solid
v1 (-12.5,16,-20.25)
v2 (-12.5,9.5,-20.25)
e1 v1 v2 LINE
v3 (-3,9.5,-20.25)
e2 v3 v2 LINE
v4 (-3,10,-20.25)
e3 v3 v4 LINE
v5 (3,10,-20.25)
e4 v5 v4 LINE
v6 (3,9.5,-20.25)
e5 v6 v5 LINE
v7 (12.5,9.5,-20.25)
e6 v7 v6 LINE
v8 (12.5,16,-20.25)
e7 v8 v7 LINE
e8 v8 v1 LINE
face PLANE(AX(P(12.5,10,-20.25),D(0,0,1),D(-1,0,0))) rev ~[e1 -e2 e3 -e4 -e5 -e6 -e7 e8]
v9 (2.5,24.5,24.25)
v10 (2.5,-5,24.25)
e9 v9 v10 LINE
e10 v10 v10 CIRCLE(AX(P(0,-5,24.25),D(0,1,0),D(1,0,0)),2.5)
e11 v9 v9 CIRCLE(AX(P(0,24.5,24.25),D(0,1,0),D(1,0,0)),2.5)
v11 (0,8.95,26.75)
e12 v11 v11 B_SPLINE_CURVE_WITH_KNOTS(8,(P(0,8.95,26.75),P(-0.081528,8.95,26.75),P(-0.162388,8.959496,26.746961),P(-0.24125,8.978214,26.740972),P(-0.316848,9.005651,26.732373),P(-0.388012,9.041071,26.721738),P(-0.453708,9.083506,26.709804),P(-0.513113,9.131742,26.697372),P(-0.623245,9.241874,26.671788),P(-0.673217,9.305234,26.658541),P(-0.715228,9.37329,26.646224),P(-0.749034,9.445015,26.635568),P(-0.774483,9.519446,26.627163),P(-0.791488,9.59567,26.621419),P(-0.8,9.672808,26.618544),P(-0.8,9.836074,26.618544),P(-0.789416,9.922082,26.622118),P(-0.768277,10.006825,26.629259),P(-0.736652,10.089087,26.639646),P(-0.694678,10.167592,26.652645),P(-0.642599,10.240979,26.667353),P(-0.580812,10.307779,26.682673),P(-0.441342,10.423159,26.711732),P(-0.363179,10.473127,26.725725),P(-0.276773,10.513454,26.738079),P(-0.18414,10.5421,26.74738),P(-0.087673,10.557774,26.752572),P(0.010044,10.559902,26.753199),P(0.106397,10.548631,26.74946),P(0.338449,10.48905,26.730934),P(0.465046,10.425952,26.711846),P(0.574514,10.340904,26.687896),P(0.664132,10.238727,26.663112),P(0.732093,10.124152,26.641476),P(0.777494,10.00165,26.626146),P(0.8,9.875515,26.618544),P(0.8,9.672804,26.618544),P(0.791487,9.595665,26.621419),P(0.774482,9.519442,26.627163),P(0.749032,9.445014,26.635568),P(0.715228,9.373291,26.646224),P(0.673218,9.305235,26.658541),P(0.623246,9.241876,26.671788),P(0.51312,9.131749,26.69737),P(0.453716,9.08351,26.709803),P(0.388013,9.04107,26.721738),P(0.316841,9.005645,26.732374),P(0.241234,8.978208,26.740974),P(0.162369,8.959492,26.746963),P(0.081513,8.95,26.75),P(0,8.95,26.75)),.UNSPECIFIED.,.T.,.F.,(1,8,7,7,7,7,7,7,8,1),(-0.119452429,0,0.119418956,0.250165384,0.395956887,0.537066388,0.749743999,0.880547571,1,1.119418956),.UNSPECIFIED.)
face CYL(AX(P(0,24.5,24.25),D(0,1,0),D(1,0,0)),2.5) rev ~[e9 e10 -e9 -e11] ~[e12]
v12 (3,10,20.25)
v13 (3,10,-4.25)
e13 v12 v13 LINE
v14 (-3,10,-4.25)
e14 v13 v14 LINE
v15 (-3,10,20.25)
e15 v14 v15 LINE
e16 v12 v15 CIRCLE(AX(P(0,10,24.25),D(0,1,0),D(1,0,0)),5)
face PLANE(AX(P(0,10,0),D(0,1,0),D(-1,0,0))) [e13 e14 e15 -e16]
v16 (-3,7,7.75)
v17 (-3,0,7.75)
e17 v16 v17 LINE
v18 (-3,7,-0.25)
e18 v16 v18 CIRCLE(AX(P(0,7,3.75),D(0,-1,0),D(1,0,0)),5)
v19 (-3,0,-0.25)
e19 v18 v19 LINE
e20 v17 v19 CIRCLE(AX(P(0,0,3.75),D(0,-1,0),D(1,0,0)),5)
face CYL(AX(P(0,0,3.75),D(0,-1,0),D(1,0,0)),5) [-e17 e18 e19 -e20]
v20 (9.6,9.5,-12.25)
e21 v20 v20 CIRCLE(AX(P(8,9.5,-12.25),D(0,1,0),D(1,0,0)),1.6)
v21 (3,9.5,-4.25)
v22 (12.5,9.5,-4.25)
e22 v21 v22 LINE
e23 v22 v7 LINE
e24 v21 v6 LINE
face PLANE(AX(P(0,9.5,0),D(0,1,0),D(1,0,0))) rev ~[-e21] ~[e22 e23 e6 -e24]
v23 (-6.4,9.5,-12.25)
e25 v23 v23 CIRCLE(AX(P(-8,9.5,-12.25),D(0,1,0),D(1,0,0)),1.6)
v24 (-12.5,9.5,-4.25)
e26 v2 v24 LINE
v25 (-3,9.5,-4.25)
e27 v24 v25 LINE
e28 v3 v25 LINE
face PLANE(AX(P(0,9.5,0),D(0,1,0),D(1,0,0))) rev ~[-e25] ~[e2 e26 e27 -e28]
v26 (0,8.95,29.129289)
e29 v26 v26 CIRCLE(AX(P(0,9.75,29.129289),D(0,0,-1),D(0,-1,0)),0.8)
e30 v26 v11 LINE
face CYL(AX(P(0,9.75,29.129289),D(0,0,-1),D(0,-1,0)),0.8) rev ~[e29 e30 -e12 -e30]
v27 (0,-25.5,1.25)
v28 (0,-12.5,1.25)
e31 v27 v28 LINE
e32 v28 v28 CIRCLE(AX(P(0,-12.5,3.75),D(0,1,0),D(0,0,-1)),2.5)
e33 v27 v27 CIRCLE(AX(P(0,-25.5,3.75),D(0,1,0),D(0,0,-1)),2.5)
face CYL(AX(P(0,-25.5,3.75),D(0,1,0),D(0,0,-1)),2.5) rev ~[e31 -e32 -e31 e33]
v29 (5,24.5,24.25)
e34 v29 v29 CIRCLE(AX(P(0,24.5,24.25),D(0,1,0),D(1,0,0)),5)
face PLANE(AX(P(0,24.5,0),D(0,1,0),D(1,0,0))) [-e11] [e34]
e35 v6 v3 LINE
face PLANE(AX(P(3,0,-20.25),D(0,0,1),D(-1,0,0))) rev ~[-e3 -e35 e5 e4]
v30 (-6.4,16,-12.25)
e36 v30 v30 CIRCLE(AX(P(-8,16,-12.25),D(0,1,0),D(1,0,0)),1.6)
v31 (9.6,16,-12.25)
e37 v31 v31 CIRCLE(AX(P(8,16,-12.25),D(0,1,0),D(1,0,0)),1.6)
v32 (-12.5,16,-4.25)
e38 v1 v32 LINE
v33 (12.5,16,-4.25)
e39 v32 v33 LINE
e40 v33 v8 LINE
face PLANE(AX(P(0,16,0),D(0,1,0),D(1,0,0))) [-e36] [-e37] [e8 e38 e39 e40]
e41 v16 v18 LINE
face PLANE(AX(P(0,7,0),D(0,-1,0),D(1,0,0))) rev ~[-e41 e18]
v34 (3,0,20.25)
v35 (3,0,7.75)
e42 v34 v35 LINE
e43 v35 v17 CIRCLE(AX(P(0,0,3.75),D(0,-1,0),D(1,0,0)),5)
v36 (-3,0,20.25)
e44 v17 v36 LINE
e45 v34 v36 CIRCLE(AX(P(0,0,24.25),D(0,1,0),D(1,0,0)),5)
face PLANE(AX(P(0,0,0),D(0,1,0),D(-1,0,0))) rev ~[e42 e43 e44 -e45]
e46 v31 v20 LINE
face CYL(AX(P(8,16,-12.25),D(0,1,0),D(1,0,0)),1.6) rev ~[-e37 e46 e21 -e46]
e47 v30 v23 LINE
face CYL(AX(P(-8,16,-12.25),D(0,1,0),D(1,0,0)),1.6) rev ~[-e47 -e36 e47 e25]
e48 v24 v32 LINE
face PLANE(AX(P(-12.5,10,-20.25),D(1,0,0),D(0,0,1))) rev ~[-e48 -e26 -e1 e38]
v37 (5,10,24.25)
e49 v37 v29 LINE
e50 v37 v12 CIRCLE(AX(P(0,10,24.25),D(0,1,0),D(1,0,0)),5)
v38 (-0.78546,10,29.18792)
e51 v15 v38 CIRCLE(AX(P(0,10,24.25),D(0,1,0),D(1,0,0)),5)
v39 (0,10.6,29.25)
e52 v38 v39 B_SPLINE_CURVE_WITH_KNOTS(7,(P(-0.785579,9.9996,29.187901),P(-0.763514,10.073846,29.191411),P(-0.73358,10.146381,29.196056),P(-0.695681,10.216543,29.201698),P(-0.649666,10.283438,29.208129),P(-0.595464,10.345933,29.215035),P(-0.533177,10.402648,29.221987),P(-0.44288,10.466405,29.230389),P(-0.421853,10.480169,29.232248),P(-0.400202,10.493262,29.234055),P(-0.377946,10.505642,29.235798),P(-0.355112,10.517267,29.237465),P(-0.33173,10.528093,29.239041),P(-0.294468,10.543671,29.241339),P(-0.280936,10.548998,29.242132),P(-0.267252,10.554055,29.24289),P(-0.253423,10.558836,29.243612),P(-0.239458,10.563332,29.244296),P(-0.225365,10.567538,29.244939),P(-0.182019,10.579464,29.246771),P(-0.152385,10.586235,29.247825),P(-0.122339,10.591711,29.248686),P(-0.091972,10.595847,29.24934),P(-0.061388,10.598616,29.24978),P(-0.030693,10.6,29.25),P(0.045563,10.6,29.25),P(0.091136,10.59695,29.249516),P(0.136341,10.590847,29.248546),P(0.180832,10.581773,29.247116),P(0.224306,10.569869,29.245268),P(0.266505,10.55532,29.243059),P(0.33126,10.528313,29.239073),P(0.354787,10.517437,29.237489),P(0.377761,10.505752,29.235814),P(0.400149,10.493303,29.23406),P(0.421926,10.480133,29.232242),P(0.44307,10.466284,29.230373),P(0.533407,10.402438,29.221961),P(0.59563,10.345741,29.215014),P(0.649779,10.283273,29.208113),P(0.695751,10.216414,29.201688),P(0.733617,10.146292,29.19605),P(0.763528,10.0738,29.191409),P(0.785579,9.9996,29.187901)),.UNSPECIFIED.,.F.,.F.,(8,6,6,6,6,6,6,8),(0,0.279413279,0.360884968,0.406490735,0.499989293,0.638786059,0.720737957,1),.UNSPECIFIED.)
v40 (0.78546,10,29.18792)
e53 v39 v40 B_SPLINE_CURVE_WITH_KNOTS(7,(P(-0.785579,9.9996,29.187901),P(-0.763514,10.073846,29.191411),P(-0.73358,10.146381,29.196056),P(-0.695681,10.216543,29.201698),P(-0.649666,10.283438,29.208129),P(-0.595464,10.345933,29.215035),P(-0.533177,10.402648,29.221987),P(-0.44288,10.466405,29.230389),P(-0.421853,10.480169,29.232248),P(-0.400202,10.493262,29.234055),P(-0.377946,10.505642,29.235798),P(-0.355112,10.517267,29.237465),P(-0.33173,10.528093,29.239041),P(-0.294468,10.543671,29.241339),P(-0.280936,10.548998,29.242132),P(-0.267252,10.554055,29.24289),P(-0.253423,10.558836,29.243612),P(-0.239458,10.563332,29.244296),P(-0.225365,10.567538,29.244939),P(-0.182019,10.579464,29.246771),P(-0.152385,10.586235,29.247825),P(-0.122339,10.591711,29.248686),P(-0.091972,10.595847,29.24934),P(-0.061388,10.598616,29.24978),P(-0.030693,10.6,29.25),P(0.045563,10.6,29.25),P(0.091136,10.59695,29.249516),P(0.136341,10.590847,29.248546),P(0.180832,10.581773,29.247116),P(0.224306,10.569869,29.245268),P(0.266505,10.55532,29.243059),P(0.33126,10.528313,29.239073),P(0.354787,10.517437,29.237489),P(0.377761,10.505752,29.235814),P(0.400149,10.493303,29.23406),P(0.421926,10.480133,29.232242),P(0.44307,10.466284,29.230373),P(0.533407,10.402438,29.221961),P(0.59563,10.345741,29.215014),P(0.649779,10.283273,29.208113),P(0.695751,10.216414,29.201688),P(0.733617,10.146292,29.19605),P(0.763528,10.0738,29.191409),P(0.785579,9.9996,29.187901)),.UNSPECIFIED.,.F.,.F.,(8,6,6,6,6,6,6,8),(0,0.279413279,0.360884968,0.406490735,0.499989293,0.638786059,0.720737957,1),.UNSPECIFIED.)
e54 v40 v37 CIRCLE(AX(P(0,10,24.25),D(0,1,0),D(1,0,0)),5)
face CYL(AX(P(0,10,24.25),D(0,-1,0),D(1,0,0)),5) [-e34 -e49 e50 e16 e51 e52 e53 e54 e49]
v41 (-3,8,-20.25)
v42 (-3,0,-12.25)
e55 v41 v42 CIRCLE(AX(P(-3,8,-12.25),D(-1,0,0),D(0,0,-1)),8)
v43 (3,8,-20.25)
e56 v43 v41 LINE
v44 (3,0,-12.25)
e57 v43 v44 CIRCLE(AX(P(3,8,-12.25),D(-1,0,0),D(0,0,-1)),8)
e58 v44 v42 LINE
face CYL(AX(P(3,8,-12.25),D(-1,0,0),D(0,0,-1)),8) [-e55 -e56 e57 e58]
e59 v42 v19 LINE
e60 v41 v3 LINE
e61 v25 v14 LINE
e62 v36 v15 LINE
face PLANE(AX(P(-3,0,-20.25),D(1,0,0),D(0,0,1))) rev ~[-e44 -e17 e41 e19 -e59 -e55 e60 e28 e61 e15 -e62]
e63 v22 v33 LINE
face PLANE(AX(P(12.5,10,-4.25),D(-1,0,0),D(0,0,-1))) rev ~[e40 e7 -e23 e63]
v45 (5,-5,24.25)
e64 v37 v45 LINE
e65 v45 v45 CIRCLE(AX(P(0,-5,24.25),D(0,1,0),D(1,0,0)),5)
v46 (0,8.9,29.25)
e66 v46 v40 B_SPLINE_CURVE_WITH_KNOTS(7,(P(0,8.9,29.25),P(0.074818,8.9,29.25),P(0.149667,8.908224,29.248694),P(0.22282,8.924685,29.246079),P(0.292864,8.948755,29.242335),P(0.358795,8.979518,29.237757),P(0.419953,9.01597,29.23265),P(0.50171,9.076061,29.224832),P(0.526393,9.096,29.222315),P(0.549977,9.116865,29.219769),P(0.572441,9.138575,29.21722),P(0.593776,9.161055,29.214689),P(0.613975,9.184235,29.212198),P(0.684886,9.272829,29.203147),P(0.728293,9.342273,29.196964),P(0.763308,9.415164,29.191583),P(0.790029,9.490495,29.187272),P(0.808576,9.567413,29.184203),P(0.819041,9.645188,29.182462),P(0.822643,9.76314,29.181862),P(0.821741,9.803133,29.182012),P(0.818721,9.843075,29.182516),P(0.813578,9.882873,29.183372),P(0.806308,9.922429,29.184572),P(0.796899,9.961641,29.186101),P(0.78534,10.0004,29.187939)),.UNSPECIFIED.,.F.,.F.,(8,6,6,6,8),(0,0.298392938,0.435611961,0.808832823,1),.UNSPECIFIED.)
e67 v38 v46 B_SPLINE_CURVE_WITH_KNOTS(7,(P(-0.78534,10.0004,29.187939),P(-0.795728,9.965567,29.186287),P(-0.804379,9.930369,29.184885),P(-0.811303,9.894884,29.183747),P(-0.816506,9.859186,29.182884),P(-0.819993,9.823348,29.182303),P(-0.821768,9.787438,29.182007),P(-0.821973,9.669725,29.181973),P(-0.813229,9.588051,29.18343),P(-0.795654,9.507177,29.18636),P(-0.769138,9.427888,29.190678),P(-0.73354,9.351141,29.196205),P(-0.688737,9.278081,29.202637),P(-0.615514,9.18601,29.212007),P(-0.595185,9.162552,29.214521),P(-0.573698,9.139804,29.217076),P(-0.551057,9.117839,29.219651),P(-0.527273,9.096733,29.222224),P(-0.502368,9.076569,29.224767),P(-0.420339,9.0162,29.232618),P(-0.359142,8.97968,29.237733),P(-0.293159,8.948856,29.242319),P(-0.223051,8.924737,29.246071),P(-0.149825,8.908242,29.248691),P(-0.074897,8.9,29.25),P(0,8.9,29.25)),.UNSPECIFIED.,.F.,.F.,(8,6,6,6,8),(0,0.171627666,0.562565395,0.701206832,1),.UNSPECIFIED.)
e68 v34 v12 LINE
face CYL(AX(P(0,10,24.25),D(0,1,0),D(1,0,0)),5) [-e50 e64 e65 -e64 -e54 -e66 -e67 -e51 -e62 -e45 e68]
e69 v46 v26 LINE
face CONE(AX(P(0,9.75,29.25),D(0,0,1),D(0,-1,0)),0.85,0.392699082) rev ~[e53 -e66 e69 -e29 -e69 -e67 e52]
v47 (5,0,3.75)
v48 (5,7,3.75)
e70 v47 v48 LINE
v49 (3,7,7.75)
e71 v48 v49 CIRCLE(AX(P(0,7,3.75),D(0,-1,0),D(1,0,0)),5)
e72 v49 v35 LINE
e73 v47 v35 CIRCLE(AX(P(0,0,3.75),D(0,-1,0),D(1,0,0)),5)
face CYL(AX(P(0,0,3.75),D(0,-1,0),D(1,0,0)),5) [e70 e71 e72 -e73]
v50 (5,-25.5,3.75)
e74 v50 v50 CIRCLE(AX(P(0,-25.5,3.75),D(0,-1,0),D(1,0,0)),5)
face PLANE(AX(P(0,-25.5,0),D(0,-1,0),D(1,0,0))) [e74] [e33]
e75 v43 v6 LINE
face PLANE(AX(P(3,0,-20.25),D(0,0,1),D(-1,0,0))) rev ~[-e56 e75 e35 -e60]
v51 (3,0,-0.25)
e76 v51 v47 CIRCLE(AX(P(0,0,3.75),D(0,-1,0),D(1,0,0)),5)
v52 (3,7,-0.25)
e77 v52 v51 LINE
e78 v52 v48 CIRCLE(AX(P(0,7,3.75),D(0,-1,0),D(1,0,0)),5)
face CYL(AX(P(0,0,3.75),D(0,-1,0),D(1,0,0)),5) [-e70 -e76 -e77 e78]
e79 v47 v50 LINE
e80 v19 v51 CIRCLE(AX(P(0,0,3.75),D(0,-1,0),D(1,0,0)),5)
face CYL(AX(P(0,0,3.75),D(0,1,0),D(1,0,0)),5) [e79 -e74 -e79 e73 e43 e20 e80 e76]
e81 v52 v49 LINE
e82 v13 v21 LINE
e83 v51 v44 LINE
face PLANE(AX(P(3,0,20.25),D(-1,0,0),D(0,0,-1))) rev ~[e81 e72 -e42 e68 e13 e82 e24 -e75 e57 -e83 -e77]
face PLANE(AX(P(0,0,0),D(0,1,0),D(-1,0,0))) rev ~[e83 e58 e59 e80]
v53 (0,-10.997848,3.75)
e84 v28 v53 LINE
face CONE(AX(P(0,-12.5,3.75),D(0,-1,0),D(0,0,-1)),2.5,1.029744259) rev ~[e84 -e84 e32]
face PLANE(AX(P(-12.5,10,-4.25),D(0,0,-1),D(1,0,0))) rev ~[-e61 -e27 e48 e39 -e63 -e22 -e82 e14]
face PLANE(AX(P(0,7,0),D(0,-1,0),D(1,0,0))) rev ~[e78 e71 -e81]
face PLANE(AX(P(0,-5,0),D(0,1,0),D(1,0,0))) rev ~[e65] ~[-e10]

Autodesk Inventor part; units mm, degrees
ref_plane "YZ Plane" through (0, 0, 0) normal (1, 0, 0) x (0, 1, 0)
ref_plane "XZ Plane" through (0, 0, 0) normal (0, 1, 0) x (-1, 0, 0)
sketch "Sketch1" plane through (0, 0, 0) normal (0, 1, 0) x (-1, 0, 0)
  line L0 (3, 20.25) -> (-3, 20.25)
  line L1 (-3, 20.25) -> (-3, -20.25)
  line L2 (-3, -20.25) -> (3, -20.25)
  line L3 (3, -20.25) -> (3, 20.25)
  line L4 (3, 20.25) -> (-3, -20.25) construction
  line L5 (-3, 20.25) -> (3, -20.25) construction
  point P0 (0, 0)
  dimension "d0" = 6
  dimension "d1" = 40.5
extrude "Extrusion1" add sketch "Sketch1" along normal blind 10
fillet "Fillet1" radius 8 1 edges at (0, 0, -20.25)
sketch "Sketch2" plane through (0, 10, 0) normal (0, 1, 0) x (1, 0, 0)
  line L0 (3, 20.25) -> (-3, 20.25) construction
  line L1 (0, 20.25) -> (0, -24.25) construction
  circle A0 centre (0, -24.25) radius 5
  point P0 (0, 0)
  dimension "d5" = 44.5
  dimension "d6" = 10
extrude "Extrusion2" add sketch "Sketch2" along normal blind 14.5 and the other way blind 15
sketch "Sketch3" plane through (0, 0, 0) normal (0, -1, 0) x (1, 0, 0)
  line L0 (3, -20.25) -> (-3, -20.25) construction
  line L1 (0, -20.25) -> (0, 3.75) construction
  circle A0 centre (0, 3.75) radius 5
  point P0 (0, 0)
  dimension "d11" = 24
  dimension "d12" = 10
extrude "Extrusion3" add sketch "Sketch3" along normal blind 25.5 and the other way blind 7
sketch "Sketch4" plane through (0, 10, 0) normal (0, 1, 0) x (1, 0, 0)
  line L0 (-3, 20.25) -> (3, 20.25) construction
  line L1 (0, 20.25) -> (0, 12.25) construction
  line L2 (-12.5, 4.25) -> (12.5, 4.25)
  line L3 (12.5, 4.25) -> (12.5, 20.25)
  line L4 (12.5, 20.25) -> (-12.5, 20.25)
  line L5 (-12.5, 20.25) -> (-12.5, 4.25)
  line L6 (-12.5, 4.25) -> (12.5, 20.25) construction
  line L7 (12.5, 4.25) -> (-12.5, 20.25) construction
  point P0 (0, 0)
  dimension "d17" = 8
  dimension "d18" = 25
extrude "Extrusion4" add sketch "Sketch4" along normal blind 6 and the other way blind 0.5
sketch "Sketch5" plane through (0, 16, 0) normal (0, 1, 0) x (1, 0, 0)
  line L0 (-3, 20.25) -> (3, 20.25) construction
  line L1 (0, 20.25) -> (0, 12.25) construction
  line L2 (0, 12.25) -> (-8, 12.25) construction
  circle A0 centre (-8, 12.25) radius 1.6
  circle A1 centre (8, 12.25) radius 1.6
  point P0 (0, 0)
  dimension "d23" = 8
  dimension "d24" = 8
  dimension "d25" = 3.2
extrude "Extrusion5" cut sketch "Sketch5" against normal through all
sketch "Sketch6" plane through (0, 24.5, 24.25) normal (0, 1, 0) x (1, 0, 0)
  circle A0 centre (0, 0) radius 2.5
  point P0 (0, 24.25)
  dimension "d28" = 5
extrude "Extrusion6" cut sketch "Sketch6" against normal through all
sketch "Sketch7" plane through (0, -25.5, 3.75) normal (0, -1, 0) x (1, 0, 0)
  circle A0 centre (0, 0) radius 1.3196
  point P0 (0, -3.75)
hole "Hole1" at (0, -25.5, 3.75) direction (0, 1, 0) diameter 5 depth 13 tip angle 118
ref_plane "Work Plane1" through (0, 0, 29.25) normal (0, 0, 1) x (1, 0, 0)
sketch "Sketch8" plane through (0, 0, 29.25) normal (0, 0, 1) x (1, 0, 0)
  line L0 (5, 24.5) -> (-5, 24.5) projected
  line L1 (0, 24.5) -> (0, 9.75)
  circle A0 centre (0, 9.75) radius 0.8
  point P0 (0, 0)
  dimension "d39" = 14.75
  dimension "d40" = 1.6
hole "Hole2" at (0, 9.75, 29.25) direction (0, 0, -1) diameter 1.6 end up to surface countersink diameter 1.7 countersink angle 45
properties part number "Supporto DX"
